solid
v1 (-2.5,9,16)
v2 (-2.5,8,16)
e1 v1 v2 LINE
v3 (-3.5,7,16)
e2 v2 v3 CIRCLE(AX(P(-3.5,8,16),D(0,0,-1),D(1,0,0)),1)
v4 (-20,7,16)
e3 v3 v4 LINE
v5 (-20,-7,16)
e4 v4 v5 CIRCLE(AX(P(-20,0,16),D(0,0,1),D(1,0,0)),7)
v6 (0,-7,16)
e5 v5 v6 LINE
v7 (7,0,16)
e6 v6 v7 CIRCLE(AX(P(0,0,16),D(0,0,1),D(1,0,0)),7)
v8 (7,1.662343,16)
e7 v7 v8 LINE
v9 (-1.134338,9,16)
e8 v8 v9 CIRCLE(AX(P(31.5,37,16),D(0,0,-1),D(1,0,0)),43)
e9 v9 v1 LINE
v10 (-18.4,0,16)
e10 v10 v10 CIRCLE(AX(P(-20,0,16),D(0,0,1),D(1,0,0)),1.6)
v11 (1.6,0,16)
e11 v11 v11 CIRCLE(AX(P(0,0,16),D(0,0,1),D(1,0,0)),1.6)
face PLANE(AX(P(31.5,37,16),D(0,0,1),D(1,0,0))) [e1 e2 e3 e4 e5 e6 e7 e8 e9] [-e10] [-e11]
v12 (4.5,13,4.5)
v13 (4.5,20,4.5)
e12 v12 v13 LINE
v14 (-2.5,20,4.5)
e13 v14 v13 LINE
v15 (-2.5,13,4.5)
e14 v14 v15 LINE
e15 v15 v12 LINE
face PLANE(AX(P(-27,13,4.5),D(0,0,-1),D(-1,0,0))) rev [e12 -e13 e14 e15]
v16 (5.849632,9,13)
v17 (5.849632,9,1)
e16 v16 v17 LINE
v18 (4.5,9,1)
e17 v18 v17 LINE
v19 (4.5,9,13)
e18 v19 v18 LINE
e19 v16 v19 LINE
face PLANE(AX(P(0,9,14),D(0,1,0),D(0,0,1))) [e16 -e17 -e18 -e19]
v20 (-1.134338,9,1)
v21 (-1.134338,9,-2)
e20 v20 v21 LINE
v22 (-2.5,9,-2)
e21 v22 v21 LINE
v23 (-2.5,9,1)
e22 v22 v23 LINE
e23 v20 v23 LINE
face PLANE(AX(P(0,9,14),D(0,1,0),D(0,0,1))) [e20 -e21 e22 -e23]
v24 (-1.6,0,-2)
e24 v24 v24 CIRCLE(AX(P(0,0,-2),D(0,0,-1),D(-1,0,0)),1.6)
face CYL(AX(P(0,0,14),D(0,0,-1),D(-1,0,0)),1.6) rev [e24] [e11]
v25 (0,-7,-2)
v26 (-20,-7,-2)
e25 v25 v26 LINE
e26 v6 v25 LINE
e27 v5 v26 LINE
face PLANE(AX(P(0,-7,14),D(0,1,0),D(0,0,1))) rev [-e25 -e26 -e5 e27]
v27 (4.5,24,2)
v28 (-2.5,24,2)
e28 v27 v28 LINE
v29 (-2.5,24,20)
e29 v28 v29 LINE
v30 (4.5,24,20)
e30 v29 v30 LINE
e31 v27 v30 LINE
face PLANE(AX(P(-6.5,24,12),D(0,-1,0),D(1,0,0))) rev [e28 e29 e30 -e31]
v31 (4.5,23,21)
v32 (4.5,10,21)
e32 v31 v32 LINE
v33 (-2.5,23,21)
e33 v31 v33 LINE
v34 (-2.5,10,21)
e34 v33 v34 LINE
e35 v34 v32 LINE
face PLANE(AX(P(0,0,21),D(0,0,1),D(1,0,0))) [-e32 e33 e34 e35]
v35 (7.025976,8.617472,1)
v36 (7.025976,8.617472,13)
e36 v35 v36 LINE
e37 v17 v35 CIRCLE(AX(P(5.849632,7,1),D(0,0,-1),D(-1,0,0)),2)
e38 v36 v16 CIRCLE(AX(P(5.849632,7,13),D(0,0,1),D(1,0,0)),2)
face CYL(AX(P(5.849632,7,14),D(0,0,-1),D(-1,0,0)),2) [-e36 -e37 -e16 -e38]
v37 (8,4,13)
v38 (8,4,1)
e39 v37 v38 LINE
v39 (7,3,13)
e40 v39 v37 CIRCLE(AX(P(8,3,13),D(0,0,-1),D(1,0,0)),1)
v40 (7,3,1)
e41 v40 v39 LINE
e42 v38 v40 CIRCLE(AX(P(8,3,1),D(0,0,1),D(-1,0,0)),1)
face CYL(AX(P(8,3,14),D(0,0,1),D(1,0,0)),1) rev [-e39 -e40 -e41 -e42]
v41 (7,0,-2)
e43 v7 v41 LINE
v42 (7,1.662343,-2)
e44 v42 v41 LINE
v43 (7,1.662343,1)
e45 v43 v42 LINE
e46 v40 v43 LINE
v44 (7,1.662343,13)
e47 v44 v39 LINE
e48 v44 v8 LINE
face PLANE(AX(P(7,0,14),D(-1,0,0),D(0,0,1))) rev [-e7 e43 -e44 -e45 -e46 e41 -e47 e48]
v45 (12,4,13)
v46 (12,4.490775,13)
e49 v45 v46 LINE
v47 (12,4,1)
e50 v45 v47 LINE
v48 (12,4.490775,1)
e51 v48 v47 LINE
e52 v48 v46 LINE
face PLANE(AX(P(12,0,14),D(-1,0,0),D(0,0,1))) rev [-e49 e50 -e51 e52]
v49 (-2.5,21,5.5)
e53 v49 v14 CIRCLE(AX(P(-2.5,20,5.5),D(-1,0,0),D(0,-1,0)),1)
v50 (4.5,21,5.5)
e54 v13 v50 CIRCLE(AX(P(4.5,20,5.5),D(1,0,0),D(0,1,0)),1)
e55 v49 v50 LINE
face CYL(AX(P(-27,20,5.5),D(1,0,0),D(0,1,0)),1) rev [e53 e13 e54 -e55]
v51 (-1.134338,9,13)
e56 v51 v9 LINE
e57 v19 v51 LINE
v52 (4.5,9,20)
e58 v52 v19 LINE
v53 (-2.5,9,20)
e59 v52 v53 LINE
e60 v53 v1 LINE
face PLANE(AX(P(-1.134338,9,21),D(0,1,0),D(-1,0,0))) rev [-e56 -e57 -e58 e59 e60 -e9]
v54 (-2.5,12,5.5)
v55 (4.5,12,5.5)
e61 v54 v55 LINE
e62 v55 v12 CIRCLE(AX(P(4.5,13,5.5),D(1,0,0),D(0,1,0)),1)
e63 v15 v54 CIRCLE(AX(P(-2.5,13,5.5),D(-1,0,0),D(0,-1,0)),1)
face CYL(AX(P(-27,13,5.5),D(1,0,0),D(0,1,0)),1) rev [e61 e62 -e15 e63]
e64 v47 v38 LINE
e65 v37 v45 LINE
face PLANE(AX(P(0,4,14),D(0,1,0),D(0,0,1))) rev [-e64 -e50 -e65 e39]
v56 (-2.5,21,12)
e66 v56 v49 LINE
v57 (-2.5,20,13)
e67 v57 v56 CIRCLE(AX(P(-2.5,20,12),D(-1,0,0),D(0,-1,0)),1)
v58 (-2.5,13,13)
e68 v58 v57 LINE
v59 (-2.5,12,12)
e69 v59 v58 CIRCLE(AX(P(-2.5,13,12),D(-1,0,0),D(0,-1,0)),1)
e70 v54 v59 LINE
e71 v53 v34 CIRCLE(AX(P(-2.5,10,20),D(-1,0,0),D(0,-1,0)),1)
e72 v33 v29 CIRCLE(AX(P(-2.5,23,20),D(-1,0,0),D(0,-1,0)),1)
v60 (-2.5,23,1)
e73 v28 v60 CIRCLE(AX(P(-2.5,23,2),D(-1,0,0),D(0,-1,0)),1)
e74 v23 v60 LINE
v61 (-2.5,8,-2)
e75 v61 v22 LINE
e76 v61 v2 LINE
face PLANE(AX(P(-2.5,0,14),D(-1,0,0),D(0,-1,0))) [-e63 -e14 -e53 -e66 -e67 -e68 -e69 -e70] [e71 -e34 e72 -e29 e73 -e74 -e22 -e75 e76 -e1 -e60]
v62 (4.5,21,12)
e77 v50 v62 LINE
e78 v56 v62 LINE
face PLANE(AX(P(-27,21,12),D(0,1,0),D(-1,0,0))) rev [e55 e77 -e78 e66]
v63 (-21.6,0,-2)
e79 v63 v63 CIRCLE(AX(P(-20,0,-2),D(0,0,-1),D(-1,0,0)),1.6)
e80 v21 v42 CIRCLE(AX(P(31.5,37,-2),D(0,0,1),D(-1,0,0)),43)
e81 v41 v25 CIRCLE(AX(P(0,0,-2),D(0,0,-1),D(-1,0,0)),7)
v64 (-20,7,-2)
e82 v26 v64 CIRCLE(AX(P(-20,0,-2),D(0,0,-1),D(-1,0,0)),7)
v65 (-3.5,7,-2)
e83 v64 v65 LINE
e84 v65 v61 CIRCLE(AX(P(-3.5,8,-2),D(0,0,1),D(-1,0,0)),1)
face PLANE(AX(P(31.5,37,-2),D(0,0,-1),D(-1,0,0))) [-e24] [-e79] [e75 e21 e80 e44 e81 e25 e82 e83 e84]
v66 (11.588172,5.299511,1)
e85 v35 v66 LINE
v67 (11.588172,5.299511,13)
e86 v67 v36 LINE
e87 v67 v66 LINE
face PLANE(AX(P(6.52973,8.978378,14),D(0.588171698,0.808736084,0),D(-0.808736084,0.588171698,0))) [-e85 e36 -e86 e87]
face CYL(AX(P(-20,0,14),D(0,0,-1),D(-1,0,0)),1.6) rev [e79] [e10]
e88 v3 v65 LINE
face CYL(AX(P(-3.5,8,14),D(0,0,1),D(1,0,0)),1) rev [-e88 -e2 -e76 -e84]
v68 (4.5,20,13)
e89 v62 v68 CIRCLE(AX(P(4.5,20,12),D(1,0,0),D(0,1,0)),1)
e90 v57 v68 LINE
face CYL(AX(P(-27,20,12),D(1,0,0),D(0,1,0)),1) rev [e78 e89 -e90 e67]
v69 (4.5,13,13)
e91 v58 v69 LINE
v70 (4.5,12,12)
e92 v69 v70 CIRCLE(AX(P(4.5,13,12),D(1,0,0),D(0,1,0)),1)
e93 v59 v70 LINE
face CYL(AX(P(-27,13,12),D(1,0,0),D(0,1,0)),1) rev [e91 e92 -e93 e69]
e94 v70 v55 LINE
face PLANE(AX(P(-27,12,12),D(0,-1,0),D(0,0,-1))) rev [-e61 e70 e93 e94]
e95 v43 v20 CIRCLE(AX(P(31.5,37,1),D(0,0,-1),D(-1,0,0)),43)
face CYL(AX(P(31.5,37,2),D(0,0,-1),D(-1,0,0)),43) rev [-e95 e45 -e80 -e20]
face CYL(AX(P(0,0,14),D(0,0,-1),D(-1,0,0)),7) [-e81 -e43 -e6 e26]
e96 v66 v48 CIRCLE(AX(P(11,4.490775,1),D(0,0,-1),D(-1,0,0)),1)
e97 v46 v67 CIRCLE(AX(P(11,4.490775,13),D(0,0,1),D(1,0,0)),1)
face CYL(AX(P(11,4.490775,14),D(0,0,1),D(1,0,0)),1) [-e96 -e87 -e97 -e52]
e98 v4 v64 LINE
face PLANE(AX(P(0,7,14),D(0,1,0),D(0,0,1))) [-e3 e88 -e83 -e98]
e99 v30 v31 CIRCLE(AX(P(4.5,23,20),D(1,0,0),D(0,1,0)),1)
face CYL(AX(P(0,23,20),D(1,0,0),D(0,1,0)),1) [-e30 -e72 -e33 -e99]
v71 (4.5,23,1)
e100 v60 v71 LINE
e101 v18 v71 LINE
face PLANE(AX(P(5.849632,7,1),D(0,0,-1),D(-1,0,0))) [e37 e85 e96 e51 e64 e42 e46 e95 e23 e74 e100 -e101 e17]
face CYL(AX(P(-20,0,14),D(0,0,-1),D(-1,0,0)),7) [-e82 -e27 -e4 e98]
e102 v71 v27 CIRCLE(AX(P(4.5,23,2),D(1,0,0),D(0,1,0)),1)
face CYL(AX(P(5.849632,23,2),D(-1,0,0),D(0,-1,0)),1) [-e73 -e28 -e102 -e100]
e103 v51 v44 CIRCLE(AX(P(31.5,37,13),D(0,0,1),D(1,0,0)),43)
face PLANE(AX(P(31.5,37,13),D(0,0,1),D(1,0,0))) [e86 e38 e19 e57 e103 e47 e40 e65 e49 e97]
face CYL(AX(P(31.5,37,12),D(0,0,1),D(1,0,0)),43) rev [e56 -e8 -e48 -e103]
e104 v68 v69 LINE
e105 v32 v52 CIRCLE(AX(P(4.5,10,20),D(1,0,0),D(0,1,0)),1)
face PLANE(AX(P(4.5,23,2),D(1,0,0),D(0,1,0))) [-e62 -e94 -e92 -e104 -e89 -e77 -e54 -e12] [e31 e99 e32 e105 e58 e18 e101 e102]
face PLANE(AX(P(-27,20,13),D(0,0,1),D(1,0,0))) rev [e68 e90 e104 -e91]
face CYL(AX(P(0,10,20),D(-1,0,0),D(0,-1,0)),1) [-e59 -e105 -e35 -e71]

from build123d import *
from build123d.topology import SkipClean

# Parameters (mm, degrees)
SKETCH_1_R          = 7
SKETCH_1_R_2        = 1.6
EXTRUDE_1_DEPTH     = 14
FILLET_2_R          = 1
FILLET_4_R          = 2
FILLET_5_R          = 1
CUT_EXTRUDE_1_DEPTH = 10
SKETCH_4_R          = 43
SKETCH_4_W          = 56
SKETCH_4_H          = 56
CUT_EXTRUDE_2_DEPTH = 2
SKETCH_5_R          = 1.6
EXTRUDE_3_DEPTH     = 2
EXTRUDE_START       = 2
SKETCH_6_R          = 1.6
EXTRUDE_4_DEPTH     = 2
EXTRUDE_START_2     = 1
EXTRUDE_6_DEPTH     = 1
EXTRUDE_7_DEPTH     = 1
EXTRUDE_8_DEPTH     = 8
CUT_EXTRUDE_3_DEPTH = 45.127655727
FILLET_6_R          = 1
EXTRUDE_10_DEPTH    = 1


with BuildPart() as part:
    # 草图1 → 凸台-拉伸1 (new body)
    # profile 1 of 3: a face of its own
    with BuildSketch(Plane.XY):
        with BuildLine():
            Line((-2.5, 7), (-20, 7))
            ThreePointArc((-20, 7), (-15.050252532, 4.949747468), (-13, 0))
            ThreePointArc((-13, 0), (-15.050252532, -4.949747468), (-20, -7))
            Line((-20, -7), (0, -7))
            ThreePointArc((0, -7), (-4.949747468, 4.949747468), (7, 0))
            Line((7, 0), (7, 4))
            Line((7, 4), (12, 4))
            Line((12, 4), (12, 5))
            Line((12, 5), (6.5, 9))
            Line((6.5, 9), (3.5, 9))
            Line((3.5, 9), (3.5, 26))
            Line((3.5, 26), (-2.5, 26))
            Line((-2.5, 26), (-2.5, 7))
        make_face()
    # profile 2 of 3: a face of its own
    with BuildSketch(Plane.XY):
        Circle(SKETCH_1_R)
        Circle(SKETCH_1_R_2, mode=Mode.SUBTRACT)
    # profile 3 of 3: a face of its own
    with BuildSketch(Plane.XY):
        with Locations((-20, 0)):
            Circle(SKETCH_1_R)
        with Locations((-20, 0)):
            Circle(SKETCH_1_R_2, mode=Mode.SUBTRACT)
    extrude(amount=EXTRUDE_1_DEPTH)

    # 圆角2
    fillet_2_edges = [part.edges().sort_by_distance(p)[0] for p in [
        (-2.5, 7, 7),
        (7, 4, 7),
    ]]
    fillet(fillet_2_edges, radius=FILLET_2_R)

    # 圆角4
    fillet_4_edges = [part.edges().sort_by_distance(p)[0] for p in [
        (6.5, 9, 7),
    ]]
    fillet(fillet_4_edges, radius=FILLET_4_R)

    # 圆角5
    fillet_5_edges = [part.edges().sort_by_distance(p)[0] for p in [
        (12, 5, 7),
    ]]
    fillet(fillet_5_edges, radius=FILLET_5_R)

    # 草图2 → 切除-拉伸1 (cut)
    with BuildSketch(Plane(origin=(3.5, 0, 0), x_dir=(0, 0, -1), z_dir=(1, 0, 0))):
        Polygon((-12, 9), (-14, 9), (-14, 26), (0, 26), (0, 9), (-2, 9), (-2, 24), (-12, 24), align=None)
    extrude(amount=-CUT_EXTRUDE_1_DEPTH, mode=Mode.SUBTRACT)

    # 草图4 → 切除-拉伸2 (cut)
    with BuildSketch(Plane.XY.offset(14)):
        with Locations((31.5, 37)):
            Circle(SKETCH_4_R)
        with Locations((31.5, 37)):
            Rectangle(SKETCH_4_W, SKETCH_4_H, mode=Mode.SUBTRACT)
    cut_extrude_2 = extrude(amount=-CUT_EXTRUDE_2_DEPTH, mode=Mode.SUBTRACT)

    # 镜向1: 切除-拉伸2 across plane
    add(cut_extrude_2.mirror(Plane.XY.offset(7)), mode=Mode.SUBTRACT)

    # 草图5 → 凸台-拉伸3 (add)
    with SkipClean():  # the faces are left unmerged after this step: merging them gives an invalid solid
        with BuildSketch(Plane.XY.offset(14)):
            with BuildLine():
                Line((-1.134337744, 9), (-2.5, 9))
                Line((-2.5, 9), (-2.5, 8))
                ThreePointArc((-2.5, 8), (-2.792893219, 7.292893219), (-3.5, 7))
                Line((-3.5, 7), (-20, 7))
                ThreePointArc((-20, 7), (-27, 0), (-20, -7))
                Line((-20, -7), (0, -7))
                ThreePointArc((0, -7), (4.949747468, -4.949747468), (7, 0))
                Line((7, 0), (7, 1.662343032))
                ThreePointArc((7, 1.662343032), (2.698204226, 5.071070168), (-1.134337744, 9))
            make_face()
            Circle(SKETCH_5_R, mode=Mode.SUBTRACT)
            with Locations((-20, 0)):
                Circle(SKETCH_5_R, mode=Mode.SUBTRACT)
        extrude(amount=EXTRUDE_3_DEPTH)

    # 草图6 → 凸台-拉伸4 (add)
    with SkipClean():  # the faces are left unmerged after this step: merging them gives an invalid solid
        with BuildSketch(Plane(origin=(0, 0, 0), x_dir=(-1, 0, 0), z_dir=(0, 0, -1)).offset(EXTRUDE_START)):
            with BuildLine():
                Line((-7, 1.662343032), (-7, 0))
                ThreePointArc((-7, 0), (-4.949747468, -4.949747468), (0, -7))
                Line((0, -7), (20, -7))
                ThreePointArc((20, -7), (27, 0), (20, 7))
                Line((20, 7), (3.5, 7))
                ThreePointArc((3.5, 7), (2.792893219, 7.292893219), (2.5, 8))
                Line((2.5, 8), (2.5, 9))
                Line((2.5, 9), (1.134337744, 9))
                ThreePointArc((1.134337744, 9), (-2.698204226, 5.071070168), (-7, 1.662343032))
            make_face()
            with Locations((20, 0)):
                Circle(SKETCH_6_R, mode=Mode.SUBTRACT)
            Circle(SKETCH_6_R, mode=Mode.SUBTRACT)
        extrude(amount=-EXTRUDE_4_DEPTH)

    # 草图8 → 凸台-拉伸6 (add)
    with SkipClean():  # the faces are left unmerged after this step: merging them gives an invalid solid
        with BuildSketch(Plane.XY.offset(12).offset(EXTRUDE_START_2)):
            with BuildLine():
                Line((-2.5, 9), (-1.134337744, 9))
                ThreePointArc((-1.134337744, 9), (2.698204226, 5.071070168), (7, 1.662343032))
                Line((7, 1.662343032), (7, 3))
                ThreePointArc((7, 3), (7.292893219, 3.707106781), (8, 4))
                Line((8, 4), (12, 4))
                Line((12, 4), (12, 4.490775408))
                ThreePointArc((12, 4.490775408), (11.891114947, 4.944553053), (11.588171698, 5.299511493))
                Line((11.588171698, 5.299511493), (7.025975768, 8.617472169))
                ThreePointArc((7.025975768, 8.617472169), (6.468120717, 8.901965344), (5.849632373, 9))
                Line((5.849632373, 9), (3.5, 9))
                Line((3.5, 9), (3.5, 24))
                Line((3.5, 24), (-2.5, 24))
                Line((-2.5, 24), (-2.5, 9))
            make_face()
        extrude(amount=-EXTRUDE_6_DEPTH)

    # 草图9 → 凸台-拉伸7 (add)
    with SkipClean():  # the faces are left unmerged after this step: merging them gives an invalid solid
        with BuildSketch(Plane(origin=(0, 0, 2), x_dir=(-1, 0, 0), z_dir=(0, 0, -1))):
            with BuildLine():
                Line((-3.5, 24), (-3.5, 9))
                Line((-3.5, 9), (-5.849632373, 9))
                ThreePointArc((-5.849632373, 9), (-6.468120717, 8.901965344), (-7.025975768, 8.617472169))
                Line((-7.025975768, 8.617472169), (-11.588171698, 5.299511493))
                ThreePointArc((-11.588171698, 5.299511493), (-11.891114947, 4.944553053), (-12, 4.490775408))
                Line((-12, 4.490775408), (-12, 4))
                Line((-12, 4), (-8, 4))
                ThreePointArc((-8, 4), (-7.292893219, 3.707106781), (-7, 3))
                Line((-7, 3), (-7, 1.662343032))
                ThreePointArc((-7, 1.662343032), (-2.698204226, 5.071070168), (1.134337744, 9))
                Line((1.134337744, 9), (2.5, 9))
                Line((2.5, 9), (2.5, 24))
                Line((2.5, 24), (-3.5, 24))
            make_face()
        extrude(amount=EXTRUDE_7_DEPTH)

    # 草图14 → 凸台-拉伸8 (add)
    with SkipClean():  # the faces are left unmerged after this step: merging them gives an invalid solid
        with BuildSketch(Plane.XY.offset(13)):
            Polygon((-1.134337744, 9), (3.5, 9), (3.5, 24), (-2.5, 24), (-2.5, 9), align=None)
        extrude(amount=EXTRUDE_8_DEPTH)

    # 草图13 → 切除-拉伸3 (cut, through all)
    with SkipClean():  # the faces are left unmerged after this step: merging them gives an invalid solid
        with BuildSketch(Plane(origin=(3.5, 0, 0), x_dir=(0, 0, -1), z_dir=(1, 0, 0))):
            with BuildLine():
                Line((-13, 20), (-13, 13))
                ThreePointArc((-13, 13), (-12.707106781, 12.292893219), (-12, 12))
                Line((-12, 12), (-5.5, 12))
                ThreePointArc((-5.5, 12), (-4.792893219, 12.292893219), (-4.5, 13))
                Line((-4.5, 13), (-4.5, 20))
                ThreePointArc((-4.5, 20), (-4.792893219, 20.707106781), (-5.5, 21))
                Line((-5.5, 21), (-12, 21))
                ThreePointArc((-12, 21), (-12.707106781, 20.707106781), (-13, 20))
            make_face()
        extrude(amount=-CUT_EXTRUDE_3_DEPTH, mode=Mode.SUBTRACT)

    # 圆角6
    fillet_6_edges = [part.edges().sort_by_distance(p)[0] for p in [
        (0.5, 24, 1),
        (0.5, 24, 21),
        (0.5, 9, 21),
    ]]
    fillet(fillet_6_edges, radius=FILLET_6_R - 0.0001)  # a hair under: the kernel refuses the full size

    # 草图16 → 凸台-拉伸10 (add)
    with SkipClean():  # the faces are left unmerged after this step: merging them gives an invalid solid
        with BuildSketch(Plane(origin=(3.5, 0, 0), x_dir=(0, 0, -1), z_dir=(1, 0, 0)).offset(EXTRUDE_START_2)):
            with BuildLine():
                Line((-1, 9), (-1, 23))
                ThreePointArc((-1, 23), (-1.292893219, 23.707106781), (-2, 24))
                Line((-2, 24), (-20, 24))
                ThreePointArc((-20, 24), (-20.707106781, 23.707106781), (-21, 23))
                Line((-21, 23), (-21, 10))
                ThreePointArc((-21, 10), (-20.707106781, 9.292893219), (-20, 9))
                Line((-20, 9), (-13, 9))
                Line((-13, 9), (-1, 9))
            make_face()
            with BuildLine():
                Line((-12, 12), (-5.5, 12))
                ThreePointArc((-5.5, 12), (-4.792893219, 12.292893219), (-4.5, 13))
                Line((-4.5, 13), (-4.5, 20))
                ThreePointArc((-4.5, 20), (-4.792893219, 20.707106781), (-5.5, 21))
                Line((-5.5, 21), (-12, 21))
                ThreePointArc((-12, 21), (-12.707106781, 20.707106781), (-13, 20))
                Line((-13, 20), (-13, 13))
                ThreePointArc((-13, 13), (-12.707106781, 12.292893219), (-12, 12))
            make_face(mode=Mode.SUBTRACT)
        extrude(amount=-EXTRUDE_10_DEPTH)


solid = part.part
